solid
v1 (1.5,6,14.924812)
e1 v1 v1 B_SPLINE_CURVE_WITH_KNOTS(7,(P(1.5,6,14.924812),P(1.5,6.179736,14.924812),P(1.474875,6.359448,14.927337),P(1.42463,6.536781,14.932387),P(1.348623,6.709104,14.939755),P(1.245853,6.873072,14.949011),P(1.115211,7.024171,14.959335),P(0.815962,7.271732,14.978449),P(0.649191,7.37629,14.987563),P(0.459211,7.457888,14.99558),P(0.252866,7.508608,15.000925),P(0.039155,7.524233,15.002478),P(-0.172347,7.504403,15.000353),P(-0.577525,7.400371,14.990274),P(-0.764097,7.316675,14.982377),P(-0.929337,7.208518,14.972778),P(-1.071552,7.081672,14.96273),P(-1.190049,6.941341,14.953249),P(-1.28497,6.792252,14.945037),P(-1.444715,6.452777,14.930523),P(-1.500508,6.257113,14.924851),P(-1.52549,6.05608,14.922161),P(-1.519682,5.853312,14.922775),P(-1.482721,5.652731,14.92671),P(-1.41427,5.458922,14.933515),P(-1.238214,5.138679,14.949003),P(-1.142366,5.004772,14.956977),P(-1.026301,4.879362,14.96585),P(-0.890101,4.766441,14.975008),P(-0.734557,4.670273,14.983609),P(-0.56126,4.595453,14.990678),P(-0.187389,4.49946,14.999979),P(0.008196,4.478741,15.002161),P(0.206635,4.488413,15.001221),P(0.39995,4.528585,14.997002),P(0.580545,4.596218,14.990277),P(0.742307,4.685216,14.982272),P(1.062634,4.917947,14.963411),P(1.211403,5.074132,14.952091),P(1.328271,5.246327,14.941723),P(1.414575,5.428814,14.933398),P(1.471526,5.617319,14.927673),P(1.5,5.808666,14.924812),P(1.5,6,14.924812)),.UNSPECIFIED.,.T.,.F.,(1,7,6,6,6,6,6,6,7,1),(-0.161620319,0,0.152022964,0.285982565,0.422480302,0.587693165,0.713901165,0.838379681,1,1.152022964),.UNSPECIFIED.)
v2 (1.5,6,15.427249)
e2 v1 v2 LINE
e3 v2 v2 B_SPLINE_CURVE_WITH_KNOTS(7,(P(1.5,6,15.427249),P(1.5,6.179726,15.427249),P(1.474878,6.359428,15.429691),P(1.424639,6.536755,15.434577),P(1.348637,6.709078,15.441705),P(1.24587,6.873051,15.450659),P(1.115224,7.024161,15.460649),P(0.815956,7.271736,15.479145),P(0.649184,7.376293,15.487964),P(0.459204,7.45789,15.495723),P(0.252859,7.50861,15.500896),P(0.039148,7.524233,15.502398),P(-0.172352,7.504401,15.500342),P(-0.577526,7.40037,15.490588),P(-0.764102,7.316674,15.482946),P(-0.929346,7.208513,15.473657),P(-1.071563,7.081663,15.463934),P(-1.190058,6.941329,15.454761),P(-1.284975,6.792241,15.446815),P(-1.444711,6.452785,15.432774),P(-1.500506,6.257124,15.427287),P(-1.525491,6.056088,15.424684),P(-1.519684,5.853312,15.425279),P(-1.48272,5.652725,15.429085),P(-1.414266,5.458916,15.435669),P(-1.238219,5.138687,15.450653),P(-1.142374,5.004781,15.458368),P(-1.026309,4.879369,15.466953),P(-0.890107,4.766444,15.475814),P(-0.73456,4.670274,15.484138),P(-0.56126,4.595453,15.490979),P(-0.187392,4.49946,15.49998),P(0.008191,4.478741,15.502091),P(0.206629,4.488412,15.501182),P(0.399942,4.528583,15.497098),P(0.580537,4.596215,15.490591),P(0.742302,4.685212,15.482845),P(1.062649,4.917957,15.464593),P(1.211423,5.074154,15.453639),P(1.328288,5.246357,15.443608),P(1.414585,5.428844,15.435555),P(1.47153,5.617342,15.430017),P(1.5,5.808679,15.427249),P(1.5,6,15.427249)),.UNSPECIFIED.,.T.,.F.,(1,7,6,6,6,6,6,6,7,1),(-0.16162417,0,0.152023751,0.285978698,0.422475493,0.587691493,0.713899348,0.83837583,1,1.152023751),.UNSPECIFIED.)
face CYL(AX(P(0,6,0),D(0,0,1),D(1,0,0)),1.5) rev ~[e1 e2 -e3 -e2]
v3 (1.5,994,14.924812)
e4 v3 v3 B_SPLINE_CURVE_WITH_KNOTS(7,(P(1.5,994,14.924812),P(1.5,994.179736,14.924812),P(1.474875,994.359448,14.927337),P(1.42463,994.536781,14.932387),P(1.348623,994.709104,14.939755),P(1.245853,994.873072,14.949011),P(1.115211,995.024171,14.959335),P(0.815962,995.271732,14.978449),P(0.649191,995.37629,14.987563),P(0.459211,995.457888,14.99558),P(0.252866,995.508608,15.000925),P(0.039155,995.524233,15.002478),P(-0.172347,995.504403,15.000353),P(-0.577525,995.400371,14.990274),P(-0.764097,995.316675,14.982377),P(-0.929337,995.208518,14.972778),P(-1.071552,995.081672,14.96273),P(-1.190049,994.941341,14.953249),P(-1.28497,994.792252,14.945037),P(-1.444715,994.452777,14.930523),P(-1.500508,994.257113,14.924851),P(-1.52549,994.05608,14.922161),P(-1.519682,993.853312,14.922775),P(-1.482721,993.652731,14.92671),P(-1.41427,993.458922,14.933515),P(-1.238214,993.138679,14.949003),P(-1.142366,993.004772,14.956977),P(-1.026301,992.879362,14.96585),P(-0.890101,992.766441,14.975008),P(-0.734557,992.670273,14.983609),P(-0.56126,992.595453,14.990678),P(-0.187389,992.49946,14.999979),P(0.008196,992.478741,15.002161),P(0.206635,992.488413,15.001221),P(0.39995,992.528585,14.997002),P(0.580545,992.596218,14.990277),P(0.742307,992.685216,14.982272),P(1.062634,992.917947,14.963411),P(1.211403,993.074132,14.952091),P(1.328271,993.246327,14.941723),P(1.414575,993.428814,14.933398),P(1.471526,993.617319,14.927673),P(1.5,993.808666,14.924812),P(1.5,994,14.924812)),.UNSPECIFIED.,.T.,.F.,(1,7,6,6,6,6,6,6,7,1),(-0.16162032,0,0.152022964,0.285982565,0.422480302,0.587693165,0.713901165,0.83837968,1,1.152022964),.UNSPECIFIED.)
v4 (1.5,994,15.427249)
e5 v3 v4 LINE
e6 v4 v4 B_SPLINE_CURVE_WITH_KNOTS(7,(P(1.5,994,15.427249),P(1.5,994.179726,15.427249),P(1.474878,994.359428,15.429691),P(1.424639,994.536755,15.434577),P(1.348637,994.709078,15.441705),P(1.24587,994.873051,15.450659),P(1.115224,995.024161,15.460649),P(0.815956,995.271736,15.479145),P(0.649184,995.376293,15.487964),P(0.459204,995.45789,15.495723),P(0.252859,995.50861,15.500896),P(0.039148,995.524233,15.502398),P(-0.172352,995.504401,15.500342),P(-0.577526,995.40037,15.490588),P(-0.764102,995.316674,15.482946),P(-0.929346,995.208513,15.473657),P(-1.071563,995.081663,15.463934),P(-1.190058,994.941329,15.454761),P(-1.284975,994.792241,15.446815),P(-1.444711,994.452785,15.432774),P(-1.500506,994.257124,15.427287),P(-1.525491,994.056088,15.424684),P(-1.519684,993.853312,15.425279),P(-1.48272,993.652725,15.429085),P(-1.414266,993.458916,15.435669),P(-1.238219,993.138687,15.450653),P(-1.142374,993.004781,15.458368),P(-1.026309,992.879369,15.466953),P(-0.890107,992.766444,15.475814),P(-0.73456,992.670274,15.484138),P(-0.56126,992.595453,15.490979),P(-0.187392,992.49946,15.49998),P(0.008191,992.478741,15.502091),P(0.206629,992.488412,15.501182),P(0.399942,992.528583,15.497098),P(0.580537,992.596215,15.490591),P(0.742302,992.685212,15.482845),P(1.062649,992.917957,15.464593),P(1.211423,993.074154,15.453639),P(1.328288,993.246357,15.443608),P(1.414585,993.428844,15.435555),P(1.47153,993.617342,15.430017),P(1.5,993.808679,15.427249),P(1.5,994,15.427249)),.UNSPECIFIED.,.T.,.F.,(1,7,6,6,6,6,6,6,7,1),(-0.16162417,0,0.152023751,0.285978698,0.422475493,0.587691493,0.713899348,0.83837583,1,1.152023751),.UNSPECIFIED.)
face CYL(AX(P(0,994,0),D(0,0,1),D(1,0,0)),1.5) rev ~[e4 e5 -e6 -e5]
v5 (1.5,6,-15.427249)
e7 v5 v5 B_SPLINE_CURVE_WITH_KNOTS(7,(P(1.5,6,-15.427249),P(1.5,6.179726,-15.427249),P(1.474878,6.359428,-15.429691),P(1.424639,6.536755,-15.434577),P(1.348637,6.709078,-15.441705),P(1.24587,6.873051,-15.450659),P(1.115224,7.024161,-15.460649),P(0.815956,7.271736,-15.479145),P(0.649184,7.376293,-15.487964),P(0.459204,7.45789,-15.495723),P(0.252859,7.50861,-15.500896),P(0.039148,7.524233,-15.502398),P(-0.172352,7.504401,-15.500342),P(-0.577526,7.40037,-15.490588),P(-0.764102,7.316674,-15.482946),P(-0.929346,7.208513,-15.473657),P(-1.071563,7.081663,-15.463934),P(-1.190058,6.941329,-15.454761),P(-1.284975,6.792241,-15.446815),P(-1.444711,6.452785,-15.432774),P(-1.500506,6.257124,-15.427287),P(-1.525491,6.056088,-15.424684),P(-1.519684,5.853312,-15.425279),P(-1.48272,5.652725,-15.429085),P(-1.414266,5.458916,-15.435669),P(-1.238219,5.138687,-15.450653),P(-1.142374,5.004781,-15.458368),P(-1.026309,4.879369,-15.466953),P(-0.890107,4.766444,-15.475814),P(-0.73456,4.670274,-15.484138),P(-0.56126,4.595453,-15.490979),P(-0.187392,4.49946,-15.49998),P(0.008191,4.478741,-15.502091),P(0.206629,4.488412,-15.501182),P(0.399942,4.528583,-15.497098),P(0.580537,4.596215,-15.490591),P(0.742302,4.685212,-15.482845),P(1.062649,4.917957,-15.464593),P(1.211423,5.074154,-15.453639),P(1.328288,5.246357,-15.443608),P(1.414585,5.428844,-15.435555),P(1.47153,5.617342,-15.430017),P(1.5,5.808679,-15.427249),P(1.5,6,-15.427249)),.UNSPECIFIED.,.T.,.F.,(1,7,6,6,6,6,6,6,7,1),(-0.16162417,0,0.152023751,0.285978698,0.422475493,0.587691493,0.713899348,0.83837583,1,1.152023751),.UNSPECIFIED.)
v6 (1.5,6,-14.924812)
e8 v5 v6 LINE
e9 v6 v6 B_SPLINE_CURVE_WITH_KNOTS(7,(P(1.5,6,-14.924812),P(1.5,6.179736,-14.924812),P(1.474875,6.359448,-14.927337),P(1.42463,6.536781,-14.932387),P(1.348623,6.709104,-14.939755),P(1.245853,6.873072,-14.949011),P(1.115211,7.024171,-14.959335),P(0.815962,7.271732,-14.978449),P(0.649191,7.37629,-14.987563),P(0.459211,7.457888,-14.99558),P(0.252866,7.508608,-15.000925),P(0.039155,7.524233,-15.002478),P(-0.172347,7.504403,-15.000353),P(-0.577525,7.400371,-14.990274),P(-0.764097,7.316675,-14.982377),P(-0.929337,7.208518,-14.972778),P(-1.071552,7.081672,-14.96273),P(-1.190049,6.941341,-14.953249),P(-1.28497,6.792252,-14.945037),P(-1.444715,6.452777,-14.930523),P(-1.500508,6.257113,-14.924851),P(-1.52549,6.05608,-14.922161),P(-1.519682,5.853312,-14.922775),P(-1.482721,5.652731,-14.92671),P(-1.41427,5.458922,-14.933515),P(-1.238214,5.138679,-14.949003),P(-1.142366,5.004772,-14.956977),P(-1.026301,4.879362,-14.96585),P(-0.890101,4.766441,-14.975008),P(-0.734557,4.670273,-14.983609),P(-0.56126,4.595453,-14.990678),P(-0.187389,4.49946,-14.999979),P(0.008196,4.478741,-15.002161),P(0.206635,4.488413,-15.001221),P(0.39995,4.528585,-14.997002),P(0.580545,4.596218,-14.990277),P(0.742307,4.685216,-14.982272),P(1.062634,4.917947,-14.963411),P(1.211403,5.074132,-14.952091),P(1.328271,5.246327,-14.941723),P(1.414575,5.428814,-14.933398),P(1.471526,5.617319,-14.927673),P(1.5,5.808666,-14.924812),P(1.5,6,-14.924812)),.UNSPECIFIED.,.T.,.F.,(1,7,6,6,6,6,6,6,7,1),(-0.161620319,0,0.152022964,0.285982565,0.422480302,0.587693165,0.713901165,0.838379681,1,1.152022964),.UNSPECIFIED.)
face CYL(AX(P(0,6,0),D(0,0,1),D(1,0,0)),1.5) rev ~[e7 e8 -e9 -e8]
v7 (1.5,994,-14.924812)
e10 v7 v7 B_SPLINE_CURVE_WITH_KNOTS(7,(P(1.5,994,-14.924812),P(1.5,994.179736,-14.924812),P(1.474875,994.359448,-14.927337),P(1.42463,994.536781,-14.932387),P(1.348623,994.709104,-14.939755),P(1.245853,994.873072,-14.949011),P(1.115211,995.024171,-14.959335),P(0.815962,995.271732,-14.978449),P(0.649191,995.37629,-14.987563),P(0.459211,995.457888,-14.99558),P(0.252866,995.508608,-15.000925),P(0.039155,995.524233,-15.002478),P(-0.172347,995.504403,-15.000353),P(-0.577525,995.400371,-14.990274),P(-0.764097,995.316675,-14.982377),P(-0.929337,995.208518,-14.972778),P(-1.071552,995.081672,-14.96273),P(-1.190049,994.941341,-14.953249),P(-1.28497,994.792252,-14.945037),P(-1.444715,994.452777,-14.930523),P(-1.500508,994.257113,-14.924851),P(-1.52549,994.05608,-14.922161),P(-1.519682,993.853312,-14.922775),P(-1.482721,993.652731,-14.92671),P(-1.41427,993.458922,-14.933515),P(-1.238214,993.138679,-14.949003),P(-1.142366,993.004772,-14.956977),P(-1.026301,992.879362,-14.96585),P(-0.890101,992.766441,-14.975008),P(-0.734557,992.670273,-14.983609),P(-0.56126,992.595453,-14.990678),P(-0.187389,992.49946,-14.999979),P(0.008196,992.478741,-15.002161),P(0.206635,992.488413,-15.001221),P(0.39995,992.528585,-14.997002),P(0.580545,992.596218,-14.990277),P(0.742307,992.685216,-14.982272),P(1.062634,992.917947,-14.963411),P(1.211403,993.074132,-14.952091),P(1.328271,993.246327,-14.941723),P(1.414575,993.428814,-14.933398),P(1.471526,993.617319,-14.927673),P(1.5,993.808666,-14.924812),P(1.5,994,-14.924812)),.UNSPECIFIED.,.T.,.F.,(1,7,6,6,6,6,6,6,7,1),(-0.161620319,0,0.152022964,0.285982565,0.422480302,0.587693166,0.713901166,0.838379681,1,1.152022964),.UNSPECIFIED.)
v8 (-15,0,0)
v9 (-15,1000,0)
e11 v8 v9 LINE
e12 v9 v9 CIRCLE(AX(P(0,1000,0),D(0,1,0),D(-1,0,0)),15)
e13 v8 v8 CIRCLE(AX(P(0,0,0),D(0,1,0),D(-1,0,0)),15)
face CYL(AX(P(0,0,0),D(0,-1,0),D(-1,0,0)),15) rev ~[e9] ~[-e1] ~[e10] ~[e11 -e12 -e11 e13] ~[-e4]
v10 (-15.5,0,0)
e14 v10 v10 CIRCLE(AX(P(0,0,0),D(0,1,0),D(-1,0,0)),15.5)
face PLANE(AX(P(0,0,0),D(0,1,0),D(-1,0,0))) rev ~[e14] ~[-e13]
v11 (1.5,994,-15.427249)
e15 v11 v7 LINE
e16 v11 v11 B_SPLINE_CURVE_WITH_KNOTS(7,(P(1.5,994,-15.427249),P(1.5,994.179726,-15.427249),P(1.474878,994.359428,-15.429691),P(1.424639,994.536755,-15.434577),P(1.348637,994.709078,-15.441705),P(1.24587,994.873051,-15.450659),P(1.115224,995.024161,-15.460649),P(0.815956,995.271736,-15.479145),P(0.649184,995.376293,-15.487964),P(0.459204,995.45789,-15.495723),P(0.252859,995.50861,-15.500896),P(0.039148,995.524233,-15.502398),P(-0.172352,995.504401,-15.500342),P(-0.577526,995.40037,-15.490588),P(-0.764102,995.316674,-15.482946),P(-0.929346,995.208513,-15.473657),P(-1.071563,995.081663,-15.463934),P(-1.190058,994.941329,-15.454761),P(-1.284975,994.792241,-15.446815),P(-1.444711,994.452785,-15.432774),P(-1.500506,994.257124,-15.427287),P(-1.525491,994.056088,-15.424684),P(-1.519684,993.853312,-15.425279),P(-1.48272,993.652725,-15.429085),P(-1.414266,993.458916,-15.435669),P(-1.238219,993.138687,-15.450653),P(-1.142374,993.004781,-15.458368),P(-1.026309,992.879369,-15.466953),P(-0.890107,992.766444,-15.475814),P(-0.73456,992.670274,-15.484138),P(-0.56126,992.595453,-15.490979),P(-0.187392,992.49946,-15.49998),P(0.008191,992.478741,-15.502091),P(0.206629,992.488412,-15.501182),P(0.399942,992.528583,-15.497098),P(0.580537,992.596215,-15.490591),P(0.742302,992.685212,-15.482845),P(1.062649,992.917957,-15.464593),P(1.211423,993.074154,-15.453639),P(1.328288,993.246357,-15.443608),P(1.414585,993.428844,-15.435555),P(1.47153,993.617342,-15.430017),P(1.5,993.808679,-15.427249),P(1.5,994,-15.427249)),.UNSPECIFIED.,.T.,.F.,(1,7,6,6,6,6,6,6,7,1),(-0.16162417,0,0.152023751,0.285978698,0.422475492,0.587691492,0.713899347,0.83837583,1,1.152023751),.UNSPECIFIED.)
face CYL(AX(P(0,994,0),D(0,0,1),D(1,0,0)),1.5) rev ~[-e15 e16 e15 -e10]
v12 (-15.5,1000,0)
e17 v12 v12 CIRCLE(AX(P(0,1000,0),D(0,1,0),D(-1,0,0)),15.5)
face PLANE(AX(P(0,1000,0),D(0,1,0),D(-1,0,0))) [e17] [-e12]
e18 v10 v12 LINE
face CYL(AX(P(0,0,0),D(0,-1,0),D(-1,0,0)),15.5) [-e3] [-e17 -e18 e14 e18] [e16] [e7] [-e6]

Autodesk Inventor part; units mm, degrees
ref_plane "YZ Plane" through (0, 0, 0) normal (1, 0, 0) x (0, 1, 0)
ref_plane "XZ Plane" through (0, 0, 0) normal (0, 1, 0) x (-1, 0, 0)
ref_plane "XY Plane" through (0, 0, 0) normal (0, 0, 1) x (1, 0, 0)
sketch "Sketch1" plane through (0, 0, 0) normal (0, 1, 0) x (-1, 0, 0)
  circle A0 centre (0, 0) radius 15
  circle A1 centre (0, 0) radius 15.5
  dimension "d0" = 30
  dimension "d1" = 31
extrude "Extrusion1" add sketch "Sketch1" along normal blind 1000
sketch "Sketch2" plane through (0, 0, 0) normal (0, 0, 1) x (1, 0, 0)
  line L0 (0, 0) -> (0, 6)
  line L1 (0, 0) -> (6, 0) construction
  circle A0 centre (0, 6) radius 1.5
  line L2 (15.5, 1000) -> (-15.5, 1000) projected
  line L3 (0, 1000) -> (0, 994)
  circle A1 centre (0, 994) radius 1.5
  dimension "d4" = 6
  dimension "d5" = 90
  dimension "d6" = 3
  dimension "d7" = 6
  dimension "d8" = 3
extrude "Extrusion2" cut sketch "Sketch2" along normal mid plane 40
properties part number "30 mm tube"
